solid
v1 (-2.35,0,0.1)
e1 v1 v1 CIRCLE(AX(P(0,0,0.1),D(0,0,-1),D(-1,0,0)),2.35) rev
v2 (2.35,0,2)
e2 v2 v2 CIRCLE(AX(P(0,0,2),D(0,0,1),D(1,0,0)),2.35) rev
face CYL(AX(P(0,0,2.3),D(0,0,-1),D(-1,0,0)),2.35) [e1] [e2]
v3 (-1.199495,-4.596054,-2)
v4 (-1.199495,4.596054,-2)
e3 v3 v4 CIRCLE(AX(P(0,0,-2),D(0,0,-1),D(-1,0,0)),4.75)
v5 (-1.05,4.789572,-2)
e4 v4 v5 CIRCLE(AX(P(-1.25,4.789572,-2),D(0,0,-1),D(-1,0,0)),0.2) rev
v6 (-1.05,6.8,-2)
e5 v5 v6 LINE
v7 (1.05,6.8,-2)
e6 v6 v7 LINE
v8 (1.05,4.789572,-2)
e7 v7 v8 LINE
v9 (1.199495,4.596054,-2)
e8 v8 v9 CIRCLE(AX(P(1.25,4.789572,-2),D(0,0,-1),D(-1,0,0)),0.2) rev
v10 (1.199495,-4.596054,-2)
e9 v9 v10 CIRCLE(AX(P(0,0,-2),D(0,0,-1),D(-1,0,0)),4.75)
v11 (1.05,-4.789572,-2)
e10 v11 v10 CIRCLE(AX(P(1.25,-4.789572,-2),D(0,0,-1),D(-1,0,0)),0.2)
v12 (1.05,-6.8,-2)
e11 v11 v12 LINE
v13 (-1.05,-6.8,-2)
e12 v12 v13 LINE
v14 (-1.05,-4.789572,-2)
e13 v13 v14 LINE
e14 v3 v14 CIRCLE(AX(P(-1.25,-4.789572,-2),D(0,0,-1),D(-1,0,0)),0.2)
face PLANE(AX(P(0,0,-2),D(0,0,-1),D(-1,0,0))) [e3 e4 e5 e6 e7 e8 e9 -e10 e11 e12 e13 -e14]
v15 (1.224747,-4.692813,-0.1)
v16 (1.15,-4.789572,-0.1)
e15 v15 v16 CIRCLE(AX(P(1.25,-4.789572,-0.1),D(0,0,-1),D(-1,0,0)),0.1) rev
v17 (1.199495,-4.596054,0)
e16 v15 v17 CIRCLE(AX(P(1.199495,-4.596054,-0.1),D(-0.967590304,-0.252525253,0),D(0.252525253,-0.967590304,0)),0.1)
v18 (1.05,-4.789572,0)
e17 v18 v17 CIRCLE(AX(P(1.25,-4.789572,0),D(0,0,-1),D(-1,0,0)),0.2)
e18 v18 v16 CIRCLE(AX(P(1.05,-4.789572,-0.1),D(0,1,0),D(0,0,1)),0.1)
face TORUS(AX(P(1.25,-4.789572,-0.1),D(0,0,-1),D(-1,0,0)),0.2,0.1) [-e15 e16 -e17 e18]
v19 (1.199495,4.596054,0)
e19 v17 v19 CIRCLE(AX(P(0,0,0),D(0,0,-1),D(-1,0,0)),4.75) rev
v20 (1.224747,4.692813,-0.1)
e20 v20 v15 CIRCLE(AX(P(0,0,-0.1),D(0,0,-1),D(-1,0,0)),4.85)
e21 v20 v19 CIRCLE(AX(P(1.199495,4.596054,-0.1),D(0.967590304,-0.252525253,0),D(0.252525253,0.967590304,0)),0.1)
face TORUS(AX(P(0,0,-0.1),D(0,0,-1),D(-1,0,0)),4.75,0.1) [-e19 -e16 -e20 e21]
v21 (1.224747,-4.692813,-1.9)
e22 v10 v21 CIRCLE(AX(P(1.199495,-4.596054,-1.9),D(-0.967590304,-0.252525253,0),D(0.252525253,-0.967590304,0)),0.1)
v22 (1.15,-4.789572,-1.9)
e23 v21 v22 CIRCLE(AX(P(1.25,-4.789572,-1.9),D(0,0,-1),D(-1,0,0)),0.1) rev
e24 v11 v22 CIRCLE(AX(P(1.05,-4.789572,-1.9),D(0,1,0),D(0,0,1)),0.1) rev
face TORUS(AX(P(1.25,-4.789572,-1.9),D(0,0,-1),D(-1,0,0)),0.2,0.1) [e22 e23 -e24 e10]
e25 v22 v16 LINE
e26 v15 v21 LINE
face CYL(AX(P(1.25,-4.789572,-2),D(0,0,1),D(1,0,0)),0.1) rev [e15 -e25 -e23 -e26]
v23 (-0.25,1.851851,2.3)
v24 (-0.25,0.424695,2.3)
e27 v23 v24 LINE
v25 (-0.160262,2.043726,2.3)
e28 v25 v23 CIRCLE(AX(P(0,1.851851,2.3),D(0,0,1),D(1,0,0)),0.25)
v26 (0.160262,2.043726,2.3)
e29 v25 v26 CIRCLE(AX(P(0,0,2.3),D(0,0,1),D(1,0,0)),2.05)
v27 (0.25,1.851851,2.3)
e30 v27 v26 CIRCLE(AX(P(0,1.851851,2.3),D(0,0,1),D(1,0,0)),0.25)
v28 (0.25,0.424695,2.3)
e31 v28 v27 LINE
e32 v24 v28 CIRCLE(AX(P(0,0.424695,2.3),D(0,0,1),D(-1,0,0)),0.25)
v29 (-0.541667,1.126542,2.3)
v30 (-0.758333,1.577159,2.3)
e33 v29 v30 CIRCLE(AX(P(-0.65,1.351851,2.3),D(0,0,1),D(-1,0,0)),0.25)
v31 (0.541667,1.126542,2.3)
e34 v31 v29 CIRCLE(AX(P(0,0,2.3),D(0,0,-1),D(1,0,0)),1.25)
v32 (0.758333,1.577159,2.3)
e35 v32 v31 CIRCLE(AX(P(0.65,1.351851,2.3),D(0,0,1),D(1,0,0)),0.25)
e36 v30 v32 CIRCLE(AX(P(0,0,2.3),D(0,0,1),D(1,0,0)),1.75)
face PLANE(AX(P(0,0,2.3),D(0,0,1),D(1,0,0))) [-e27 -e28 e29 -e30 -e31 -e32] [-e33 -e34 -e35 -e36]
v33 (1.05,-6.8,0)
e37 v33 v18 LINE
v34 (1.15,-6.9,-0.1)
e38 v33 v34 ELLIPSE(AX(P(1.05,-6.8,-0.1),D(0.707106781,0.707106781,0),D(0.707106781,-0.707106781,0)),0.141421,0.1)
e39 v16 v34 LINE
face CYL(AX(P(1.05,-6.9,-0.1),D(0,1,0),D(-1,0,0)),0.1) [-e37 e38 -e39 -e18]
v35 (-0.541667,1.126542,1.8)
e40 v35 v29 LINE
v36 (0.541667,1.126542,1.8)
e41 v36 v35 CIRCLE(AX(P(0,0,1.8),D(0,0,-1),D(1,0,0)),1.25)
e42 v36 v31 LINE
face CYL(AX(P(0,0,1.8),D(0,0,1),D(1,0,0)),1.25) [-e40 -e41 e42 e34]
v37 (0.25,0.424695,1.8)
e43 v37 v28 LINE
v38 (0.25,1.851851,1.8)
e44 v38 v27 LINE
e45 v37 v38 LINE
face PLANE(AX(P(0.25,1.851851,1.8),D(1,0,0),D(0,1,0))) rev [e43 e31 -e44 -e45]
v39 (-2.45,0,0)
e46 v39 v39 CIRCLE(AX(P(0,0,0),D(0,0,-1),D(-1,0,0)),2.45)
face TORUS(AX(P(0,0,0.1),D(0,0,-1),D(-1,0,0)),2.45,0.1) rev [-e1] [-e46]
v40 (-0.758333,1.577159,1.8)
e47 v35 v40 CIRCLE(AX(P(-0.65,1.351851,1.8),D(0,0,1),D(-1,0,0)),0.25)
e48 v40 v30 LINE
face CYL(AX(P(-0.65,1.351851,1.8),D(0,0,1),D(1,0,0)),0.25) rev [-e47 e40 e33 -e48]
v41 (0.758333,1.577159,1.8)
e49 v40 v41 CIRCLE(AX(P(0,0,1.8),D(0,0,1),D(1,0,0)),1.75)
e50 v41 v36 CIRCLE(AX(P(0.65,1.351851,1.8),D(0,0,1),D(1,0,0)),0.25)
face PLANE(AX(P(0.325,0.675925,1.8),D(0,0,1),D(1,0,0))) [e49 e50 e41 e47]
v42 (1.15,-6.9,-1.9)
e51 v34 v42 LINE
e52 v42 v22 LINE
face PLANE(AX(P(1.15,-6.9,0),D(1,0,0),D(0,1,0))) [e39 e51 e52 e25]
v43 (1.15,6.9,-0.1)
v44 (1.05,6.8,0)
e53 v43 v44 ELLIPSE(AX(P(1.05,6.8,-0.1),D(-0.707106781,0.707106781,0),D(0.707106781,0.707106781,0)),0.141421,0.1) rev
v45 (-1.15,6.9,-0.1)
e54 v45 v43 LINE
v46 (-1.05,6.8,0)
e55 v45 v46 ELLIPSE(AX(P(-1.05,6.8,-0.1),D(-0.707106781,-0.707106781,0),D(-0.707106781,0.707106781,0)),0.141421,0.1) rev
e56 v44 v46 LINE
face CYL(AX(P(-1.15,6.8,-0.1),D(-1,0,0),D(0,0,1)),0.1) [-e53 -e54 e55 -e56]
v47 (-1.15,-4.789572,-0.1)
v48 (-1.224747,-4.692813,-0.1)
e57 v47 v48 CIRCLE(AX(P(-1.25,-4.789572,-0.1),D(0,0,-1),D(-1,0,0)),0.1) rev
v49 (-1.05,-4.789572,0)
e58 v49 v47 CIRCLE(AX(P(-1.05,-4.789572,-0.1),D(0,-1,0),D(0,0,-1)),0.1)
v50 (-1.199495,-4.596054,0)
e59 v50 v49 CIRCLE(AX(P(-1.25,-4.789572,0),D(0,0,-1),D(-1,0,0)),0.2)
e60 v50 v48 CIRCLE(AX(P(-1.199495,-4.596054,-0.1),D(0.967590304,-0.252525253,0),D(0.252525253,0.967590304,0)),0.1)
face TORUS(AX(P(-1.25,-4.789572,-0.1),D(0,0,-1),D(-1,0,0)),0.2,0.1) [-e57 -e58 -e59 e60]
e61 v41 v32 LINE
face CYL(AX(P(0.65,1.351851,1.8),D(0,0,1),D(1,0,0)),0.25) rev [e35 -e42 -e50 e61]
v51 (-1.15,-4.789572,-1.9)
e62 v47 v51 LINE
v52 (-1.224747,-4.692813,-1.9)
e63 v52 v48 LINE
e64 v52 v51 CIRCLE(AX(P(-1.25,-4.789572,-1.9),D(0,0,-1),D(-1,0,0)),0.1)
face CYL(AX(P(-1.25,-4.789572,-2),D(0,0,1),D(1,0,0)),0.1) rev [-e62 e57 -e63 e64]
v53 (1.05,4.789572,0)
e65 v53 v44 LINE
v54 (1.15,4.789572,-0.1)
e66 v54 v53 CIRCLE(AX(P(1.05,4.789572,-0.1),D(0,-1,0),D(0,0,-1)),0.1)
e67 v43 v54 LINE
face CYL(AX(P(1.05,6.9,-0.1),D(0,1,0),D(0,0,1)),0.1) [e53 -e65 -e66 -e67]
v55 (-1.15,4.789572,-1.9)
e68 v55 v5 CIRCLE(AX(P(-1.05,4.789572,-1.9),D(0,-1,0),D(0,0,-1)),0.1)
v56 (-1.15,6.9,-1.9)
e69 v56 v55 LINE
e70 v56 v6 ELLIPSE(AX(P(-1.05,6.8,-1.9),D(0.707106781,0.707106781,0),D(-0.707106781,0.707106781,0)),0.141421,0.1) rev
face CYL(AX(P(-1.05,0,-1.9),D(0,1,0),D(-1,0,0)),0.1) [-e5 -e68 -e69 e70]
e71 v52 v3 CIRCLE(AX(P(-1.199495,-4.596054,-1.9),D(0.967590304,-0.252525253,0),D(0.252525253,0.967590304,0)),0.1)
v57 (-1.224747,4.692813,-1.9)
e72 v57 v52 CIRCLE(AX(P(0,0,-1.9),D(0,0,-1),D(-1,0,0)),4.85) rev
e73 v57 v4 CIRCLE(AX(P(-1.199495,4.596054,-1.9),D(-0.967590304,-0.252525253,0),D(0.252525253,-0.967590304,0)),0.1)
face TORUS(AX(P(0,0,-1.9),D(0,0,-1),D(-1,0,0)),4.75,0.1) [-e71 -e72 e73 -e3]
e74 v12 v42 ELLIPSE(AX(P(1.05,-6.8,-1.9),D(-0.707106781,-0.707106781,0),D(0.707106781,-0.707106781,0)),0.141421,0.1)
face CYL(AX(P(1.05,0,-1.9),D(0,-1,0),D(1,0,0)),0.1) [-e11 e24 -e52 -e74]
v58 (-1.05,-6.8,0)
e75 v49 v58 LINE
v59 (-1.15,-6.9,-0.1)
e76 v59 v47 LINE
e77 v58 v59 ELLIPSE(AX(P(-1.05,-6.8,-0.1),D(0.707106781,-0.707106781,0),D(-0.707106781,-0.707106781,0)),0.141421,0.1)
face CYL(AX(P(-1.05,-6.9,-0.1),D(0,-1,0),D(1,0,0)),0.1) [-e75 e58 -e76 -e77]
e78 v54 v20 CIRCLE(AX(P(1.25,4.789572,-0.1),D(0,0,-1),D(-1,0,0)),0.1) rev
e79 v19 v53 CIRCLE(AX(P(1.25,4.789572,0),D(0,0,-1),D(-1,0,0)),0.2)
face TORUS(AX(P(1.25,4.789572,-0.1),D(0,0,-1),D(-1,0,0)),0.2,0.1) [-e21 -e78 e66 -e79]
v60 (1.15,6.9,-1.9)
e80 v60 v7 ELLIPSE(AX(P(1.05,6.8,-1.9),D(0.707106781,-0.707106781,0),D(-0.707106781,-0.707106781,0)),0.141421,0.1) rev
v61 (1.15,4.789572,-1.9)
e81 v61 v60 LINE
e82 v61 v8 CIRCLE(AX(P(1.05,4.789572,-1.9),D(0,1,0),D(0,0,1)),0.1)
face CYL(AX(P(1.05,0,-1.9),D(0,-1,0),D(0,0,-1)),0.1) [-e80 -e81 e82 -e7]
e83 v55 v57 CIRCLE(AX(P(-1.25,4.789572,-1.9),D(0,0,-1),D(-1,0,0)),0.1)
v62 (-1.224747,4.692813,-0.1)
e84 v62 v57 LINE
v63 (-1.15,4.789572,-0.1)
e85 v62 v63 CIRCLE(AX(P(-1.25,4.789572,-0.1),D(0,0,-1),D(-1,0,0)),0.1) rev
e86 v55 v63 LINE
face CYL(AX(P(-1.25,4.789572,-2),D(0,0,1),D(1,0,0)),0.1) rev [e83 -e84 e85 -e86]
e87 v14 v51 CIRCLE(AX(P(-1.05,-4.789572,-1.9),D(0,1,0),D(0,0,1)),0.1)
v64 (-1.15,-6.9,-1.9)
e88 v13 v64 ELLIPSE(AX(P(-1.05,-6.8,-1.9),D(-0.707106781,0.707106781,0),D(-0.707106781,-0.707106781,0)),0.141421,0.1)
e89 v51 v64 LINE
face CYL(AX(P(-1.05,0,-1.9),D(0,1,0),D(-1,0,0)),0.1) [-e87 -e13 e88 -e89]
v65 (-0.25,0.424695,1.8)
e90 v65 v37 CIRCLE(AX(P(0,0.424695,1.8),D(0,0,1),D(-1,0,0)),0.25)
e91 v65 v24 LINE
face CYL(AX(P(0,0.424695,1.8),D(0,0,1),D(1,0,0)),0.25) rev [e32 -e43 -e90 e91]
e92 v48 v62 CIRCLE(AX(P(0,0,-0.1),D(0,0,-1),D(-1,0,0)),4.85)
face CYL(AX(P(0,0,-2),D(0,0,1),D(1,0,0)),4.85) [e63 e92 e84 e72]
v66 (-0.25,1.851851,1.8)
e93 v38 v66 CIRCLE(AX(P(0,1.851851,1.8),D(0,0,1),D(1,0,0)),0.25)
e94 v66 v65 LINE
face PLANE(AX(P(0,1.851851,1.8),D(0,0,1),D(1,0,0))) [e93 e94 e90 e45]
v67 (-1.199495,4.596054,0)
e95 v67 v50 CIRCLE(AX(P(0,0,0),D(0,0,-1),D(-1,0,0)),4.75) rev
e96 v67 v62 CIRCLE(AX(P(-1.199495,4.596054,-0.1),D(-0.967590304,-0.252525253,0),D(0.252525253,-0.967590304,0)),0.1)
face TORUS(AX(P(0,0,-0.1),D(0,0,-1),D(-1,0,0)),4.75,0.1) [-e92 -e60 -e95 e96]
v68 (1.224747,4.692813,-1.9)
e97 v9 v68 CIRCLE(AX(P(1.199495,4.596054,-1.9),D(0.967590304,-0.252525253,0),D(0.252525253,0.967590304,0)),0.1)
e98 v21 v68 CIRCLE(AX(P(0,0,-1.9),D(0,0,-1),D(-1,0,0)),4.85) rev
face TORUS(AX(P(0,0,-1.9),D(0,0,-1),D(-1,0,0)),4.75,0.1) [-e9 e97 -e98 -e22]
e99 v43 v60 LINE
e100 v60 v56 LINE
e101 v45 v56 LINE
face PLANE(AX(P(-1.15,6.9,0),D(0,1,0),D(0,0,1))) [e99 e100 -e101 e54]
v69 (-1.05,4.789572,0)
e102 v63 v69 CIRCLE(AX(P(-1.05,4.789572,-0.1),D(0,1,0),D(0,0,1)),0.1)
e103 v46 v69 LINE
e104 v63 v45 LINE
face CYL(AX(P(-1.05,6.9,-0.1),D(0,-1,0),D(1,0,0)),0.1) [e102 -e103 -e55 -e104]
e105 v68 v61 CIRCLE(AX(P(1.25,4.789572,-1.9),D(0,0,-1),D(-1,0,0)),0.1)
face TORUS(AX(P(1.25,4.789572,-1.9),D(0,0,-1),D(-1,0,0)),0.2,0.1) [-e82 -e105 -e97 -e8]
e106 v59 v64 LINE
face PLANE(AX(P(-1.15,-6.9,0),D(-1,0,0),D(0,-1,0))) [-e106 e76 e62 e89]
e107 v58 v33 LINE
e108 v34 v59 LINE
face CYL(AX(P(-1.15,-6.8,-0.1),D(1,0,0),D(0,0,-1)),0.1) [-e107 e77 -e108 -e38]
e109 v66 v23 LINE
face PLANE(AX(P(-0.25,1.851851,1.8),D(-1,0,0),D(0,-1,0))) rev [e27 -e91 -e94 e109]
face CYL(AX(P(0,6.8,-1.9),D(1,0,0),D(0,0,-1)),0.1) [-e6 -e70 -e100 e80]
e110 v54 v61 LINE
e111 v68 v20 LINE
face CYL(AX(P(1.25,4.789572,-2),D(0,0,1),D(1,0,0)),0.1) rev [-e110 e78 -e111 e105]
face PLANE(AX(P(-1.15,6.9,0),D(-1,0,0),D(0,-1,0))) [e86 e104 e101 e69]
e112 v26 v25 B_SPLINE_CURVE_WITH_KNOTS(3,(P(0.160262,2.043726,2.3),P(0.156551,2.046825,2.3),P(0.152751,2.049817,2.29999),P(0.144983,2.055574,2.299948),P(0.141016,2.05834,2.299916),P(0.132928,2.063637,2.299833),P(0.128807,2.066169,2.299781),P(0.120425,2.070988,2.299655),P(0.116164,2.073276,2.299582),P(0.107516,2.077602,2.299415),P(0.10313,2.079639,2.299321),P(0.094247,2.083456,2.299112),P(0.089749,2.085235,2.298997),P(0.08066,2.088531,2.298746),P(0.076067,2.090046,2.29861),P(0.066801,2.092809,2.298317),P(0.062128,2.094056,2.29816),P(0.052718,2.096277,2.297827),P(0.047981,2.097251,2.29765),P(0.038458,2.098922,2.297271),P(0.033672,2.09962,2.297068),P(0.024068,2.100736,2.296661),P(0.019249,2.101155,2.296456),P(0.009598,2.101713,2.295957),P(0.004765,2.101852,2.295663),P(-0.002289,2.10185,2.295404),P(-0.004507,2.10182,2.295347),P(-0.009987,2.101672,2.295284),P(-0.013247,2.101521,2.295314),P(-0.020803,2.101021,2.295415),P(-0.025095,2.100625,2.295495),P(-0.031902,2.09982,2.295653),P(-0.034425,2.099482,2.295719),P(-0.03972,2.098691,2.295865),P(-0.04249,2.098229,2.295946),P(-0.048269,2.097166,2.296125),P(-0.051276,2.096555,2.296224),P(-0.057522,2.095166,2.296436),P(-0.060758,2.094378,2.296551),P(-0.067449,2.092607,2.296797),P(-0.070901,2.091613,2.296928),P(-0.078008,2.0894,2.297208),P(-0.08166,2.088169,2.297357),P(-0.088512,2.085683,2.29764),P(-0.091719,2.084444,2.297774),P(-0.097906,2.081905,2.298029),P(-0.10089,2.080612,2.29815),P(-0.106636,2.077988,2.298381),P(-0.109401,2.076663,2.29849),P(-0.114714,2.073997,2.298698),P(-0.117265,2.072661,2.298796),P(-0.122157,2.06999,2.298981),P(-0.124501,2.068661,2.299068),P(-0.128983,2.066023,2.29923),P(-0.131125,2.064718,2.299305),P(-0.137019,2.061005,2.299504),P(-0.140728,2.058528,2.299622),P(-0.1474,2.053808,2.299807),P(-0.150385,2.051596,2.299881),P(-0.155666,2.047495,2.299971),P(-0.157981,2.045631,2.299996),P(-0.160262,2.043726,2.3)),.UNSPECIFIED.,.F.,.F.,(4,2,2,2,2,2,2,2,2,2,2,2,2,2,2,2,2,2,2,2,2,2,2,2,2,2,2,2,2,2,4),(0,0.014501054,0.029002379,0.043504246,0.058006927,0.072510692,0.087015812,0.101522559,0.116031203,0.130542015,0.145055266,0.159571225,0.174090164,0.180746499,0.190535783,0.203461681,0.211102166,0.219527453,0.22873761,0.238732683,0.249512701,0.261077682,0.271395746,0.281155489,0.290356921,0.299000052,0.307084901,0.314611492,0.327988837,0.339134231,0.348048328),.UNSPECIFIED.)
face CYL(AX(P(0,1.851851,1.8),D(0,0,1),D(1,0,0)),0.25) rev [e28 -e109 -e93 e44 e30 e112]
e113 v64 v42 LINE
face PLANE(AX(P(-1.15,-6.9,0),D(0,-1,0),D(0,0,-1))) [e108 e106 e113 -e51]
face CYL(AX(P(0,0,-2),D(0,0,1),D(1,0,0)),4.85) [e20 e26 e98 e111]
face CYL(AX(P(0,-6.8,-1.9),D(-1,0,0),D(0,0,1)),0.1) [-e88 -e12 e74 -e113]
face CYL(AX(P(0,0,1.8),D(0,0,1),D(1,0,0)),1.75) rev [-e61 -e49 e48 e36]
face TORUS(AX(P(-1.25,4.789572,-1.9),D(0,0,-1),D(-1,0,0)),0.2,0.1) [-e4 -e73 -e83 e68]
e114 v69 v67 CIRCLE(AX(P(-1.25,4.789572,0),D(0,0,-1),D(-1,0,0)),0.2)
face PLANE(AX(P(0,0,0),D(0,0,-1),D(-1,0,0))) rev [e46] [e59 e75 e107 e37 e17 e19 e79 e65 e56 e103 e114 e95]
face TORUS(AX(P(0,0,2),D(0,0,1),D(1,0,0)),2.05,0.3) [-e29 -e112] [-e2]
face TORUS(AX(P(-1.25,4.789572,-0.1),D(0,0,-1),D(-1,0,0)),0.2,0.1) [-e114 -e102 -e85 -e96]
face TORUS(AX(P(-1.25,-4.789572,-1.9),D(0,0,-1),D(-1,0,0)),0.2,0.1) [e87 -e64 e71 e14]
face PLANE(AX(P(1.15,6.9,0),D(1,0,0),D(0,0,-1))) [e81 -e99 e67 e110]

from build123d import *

# Parameters (mm, degrees)
ESBO_O1_R                = 2.35
RESSALTO_EXTRUS_O1_DEPTH = 2.3
ESBO_O2_R                = 4.85
RESSALTO_EXTRUS_O2_DEPTH = 2
RESSALTO_EXTRUS_O3_START = -2
RESSALTO_EXTRUS_O3_DEPTH = 2
FILETE1_R                = 0.1
FILETE2_R                = 0.1
FILETE3_R                = 0.3
FILETE4_R                = 0.1
CORTE_EXTRUS_O1_DEPTH    = 0.5


with BuildPart() as part:
    # Esbo_o1 → Ressalto-extrus_o1 (new body)
    with BuildSketch(Plane.XY):
        Circle(ESBO_O1_R)
    extrude(amount=RESSALTO_EXTRUS_O1_DEPTH)

    # Esbo_o2 → Ressalto-extrus_o2 (add)
    with BuildSketch(Plane(origin=(0, 0, 0), x_dir=(-1, 0, 0), z_dir=(0, 0, -1))):
        Circle(ESBO_O2_R)
    extrude(amount=RESSALTO_EXTRUS_O2_DEPTH)

    # Esbo_o3 → Ressalto-extrus_o3 (add)
    with BuildSketch(Plane(origin=(0, 0, -2), x_dir=(-1, 0, 0), z_dir=(0, 0, -1)).offset(RESSALTO_EXTRUS_O3_START)):
        with BuildLine():
            Line((1.15, 6.9), (-1.15, 6.9))
            Line((-1.15, 6.9), (-1.15, 4.711687596))
            ThreePointArc((-1.15, 4.711687596), (0, 4.85), (1.15, 4.711687596))
            Line((1.15, 4.711687596), (1.15, 6.9))
        make_face()
        with BuildLine():
            Line((1.15, -6.9), (1.15, -4.711687596))
            ThreePointArc((1.15, -4.711687596), (0, -4.85), (-1.15, -4.711687596))
            Line((-1.15, -4.711687596), (-1.15, -6.9))
            Line((-1.15, -6.9), (1.15, -6.9))
        make_face()
    extrude(amount=RESSALTO_EXTRUS_O3_DEPTH)

    # Filete1
    filete1_edges = [part.edges().sort_by_distance(p)[0] for p in [
        (-1.15, 4.711687596, -1),
        (1.15, 4.711687596, -1),
    ]]
    fillet(filete1_edges, radius=FILETE1_R)

    # Filete2
    filete2_edges = [part.edges().sort_by_distance(p)[0] for p in [
        (0, 6.9, -2),
        (1.15, 5.844786003, -2),
        (-4.849846816, -0.038546843, -2),
        (1.15, -4.711687596, -1),
        (-1.15, -4.711687596, -1),
        (0, -6.9, -2),
        (-1.15, -5.805843798, -2),
        (1.15, -5.805843798, -2),
        (-1.15, 5.844786003, -2),
        (4.849846816, -0.038546843, -2),
        (-1.170863243, 4.728437942, -2),
        (1.170863243, 4.728437942, -2),
    ]]
    fillet(filete2_edges, radius=FILETE2_R)

    # Filete3
    filete3_edges = [part.edges().sort_by_distance(p)[0] for p in [
        (-2.35, 0, 2.3),
    ]]
    fillet(filete3_edges, radius=FILETE3_R)

    # Filete4
    filete4_edges = [part.edges().sort_by_distance(p)[0] for p in [
        (1.15, 5.844786003, 0),
        (0, 6.9, 0),
        (0, -6.9, 0),
        (-1.15, -5.844786003, 0),
        (-1.15, 5.844786003, 0),
        (4.85, 0, 0),
        (-1.170863243, 4.728437942, 0),
        (1.170863243, 4.728437942, 0),
        (-4.85, 0, 0),
        (1.15, -5.844786003, 0),
        (-2.35, 0, 0),
        (-1.170863243, -4.728437942, 0),
        (1.170863243, -4.728437942, 0),
    ]]
    fillet(filete4_edges, radius=FILETE4_R)

    # Esbo_o5 → Corte-extrus_o1 (cut)
    with BuildSketch(Plane.XY.offset(2.3)):
        with BuildLine():
            Line((-0.25, 1.851850583), (-0.25, 0.424695077))
            ThreePointArc((-0.25, 0.424695077), (0, 0.174695077), (0.25, 0.424695077))
            Line((0.25, 0.424695077), (0.25, 1.851850583))
            ThreePointArc((0.25, 1.851850583), (0, 2.101850583), (-0.25, 1.851850583))
        make_face()
        with BuildLine():
            ThreePointArc((-0.758333333, 1.577159014), (0, -1.75), (0.758333333, 1.577159014))
            ThreePointArc((0.758333333, 1.577159014), (0.424691569, 1.460183917), (0.541666667, 1.126542153))
            ThreePointArc((0.541666667, 1.126542153), (0, -1.25), (-0.541666667, 1.126542153))
            ThreePointArc((-0.541666667, 1.126542153), (-0.424691569, 1.460183917), (-0.758333333, 1.577159014))
        make_face()
    extrude(amount=-CORTE_EXTRUS_O1_DEPTH, mode=Mode.SUBTRACT)


solid = part.part
